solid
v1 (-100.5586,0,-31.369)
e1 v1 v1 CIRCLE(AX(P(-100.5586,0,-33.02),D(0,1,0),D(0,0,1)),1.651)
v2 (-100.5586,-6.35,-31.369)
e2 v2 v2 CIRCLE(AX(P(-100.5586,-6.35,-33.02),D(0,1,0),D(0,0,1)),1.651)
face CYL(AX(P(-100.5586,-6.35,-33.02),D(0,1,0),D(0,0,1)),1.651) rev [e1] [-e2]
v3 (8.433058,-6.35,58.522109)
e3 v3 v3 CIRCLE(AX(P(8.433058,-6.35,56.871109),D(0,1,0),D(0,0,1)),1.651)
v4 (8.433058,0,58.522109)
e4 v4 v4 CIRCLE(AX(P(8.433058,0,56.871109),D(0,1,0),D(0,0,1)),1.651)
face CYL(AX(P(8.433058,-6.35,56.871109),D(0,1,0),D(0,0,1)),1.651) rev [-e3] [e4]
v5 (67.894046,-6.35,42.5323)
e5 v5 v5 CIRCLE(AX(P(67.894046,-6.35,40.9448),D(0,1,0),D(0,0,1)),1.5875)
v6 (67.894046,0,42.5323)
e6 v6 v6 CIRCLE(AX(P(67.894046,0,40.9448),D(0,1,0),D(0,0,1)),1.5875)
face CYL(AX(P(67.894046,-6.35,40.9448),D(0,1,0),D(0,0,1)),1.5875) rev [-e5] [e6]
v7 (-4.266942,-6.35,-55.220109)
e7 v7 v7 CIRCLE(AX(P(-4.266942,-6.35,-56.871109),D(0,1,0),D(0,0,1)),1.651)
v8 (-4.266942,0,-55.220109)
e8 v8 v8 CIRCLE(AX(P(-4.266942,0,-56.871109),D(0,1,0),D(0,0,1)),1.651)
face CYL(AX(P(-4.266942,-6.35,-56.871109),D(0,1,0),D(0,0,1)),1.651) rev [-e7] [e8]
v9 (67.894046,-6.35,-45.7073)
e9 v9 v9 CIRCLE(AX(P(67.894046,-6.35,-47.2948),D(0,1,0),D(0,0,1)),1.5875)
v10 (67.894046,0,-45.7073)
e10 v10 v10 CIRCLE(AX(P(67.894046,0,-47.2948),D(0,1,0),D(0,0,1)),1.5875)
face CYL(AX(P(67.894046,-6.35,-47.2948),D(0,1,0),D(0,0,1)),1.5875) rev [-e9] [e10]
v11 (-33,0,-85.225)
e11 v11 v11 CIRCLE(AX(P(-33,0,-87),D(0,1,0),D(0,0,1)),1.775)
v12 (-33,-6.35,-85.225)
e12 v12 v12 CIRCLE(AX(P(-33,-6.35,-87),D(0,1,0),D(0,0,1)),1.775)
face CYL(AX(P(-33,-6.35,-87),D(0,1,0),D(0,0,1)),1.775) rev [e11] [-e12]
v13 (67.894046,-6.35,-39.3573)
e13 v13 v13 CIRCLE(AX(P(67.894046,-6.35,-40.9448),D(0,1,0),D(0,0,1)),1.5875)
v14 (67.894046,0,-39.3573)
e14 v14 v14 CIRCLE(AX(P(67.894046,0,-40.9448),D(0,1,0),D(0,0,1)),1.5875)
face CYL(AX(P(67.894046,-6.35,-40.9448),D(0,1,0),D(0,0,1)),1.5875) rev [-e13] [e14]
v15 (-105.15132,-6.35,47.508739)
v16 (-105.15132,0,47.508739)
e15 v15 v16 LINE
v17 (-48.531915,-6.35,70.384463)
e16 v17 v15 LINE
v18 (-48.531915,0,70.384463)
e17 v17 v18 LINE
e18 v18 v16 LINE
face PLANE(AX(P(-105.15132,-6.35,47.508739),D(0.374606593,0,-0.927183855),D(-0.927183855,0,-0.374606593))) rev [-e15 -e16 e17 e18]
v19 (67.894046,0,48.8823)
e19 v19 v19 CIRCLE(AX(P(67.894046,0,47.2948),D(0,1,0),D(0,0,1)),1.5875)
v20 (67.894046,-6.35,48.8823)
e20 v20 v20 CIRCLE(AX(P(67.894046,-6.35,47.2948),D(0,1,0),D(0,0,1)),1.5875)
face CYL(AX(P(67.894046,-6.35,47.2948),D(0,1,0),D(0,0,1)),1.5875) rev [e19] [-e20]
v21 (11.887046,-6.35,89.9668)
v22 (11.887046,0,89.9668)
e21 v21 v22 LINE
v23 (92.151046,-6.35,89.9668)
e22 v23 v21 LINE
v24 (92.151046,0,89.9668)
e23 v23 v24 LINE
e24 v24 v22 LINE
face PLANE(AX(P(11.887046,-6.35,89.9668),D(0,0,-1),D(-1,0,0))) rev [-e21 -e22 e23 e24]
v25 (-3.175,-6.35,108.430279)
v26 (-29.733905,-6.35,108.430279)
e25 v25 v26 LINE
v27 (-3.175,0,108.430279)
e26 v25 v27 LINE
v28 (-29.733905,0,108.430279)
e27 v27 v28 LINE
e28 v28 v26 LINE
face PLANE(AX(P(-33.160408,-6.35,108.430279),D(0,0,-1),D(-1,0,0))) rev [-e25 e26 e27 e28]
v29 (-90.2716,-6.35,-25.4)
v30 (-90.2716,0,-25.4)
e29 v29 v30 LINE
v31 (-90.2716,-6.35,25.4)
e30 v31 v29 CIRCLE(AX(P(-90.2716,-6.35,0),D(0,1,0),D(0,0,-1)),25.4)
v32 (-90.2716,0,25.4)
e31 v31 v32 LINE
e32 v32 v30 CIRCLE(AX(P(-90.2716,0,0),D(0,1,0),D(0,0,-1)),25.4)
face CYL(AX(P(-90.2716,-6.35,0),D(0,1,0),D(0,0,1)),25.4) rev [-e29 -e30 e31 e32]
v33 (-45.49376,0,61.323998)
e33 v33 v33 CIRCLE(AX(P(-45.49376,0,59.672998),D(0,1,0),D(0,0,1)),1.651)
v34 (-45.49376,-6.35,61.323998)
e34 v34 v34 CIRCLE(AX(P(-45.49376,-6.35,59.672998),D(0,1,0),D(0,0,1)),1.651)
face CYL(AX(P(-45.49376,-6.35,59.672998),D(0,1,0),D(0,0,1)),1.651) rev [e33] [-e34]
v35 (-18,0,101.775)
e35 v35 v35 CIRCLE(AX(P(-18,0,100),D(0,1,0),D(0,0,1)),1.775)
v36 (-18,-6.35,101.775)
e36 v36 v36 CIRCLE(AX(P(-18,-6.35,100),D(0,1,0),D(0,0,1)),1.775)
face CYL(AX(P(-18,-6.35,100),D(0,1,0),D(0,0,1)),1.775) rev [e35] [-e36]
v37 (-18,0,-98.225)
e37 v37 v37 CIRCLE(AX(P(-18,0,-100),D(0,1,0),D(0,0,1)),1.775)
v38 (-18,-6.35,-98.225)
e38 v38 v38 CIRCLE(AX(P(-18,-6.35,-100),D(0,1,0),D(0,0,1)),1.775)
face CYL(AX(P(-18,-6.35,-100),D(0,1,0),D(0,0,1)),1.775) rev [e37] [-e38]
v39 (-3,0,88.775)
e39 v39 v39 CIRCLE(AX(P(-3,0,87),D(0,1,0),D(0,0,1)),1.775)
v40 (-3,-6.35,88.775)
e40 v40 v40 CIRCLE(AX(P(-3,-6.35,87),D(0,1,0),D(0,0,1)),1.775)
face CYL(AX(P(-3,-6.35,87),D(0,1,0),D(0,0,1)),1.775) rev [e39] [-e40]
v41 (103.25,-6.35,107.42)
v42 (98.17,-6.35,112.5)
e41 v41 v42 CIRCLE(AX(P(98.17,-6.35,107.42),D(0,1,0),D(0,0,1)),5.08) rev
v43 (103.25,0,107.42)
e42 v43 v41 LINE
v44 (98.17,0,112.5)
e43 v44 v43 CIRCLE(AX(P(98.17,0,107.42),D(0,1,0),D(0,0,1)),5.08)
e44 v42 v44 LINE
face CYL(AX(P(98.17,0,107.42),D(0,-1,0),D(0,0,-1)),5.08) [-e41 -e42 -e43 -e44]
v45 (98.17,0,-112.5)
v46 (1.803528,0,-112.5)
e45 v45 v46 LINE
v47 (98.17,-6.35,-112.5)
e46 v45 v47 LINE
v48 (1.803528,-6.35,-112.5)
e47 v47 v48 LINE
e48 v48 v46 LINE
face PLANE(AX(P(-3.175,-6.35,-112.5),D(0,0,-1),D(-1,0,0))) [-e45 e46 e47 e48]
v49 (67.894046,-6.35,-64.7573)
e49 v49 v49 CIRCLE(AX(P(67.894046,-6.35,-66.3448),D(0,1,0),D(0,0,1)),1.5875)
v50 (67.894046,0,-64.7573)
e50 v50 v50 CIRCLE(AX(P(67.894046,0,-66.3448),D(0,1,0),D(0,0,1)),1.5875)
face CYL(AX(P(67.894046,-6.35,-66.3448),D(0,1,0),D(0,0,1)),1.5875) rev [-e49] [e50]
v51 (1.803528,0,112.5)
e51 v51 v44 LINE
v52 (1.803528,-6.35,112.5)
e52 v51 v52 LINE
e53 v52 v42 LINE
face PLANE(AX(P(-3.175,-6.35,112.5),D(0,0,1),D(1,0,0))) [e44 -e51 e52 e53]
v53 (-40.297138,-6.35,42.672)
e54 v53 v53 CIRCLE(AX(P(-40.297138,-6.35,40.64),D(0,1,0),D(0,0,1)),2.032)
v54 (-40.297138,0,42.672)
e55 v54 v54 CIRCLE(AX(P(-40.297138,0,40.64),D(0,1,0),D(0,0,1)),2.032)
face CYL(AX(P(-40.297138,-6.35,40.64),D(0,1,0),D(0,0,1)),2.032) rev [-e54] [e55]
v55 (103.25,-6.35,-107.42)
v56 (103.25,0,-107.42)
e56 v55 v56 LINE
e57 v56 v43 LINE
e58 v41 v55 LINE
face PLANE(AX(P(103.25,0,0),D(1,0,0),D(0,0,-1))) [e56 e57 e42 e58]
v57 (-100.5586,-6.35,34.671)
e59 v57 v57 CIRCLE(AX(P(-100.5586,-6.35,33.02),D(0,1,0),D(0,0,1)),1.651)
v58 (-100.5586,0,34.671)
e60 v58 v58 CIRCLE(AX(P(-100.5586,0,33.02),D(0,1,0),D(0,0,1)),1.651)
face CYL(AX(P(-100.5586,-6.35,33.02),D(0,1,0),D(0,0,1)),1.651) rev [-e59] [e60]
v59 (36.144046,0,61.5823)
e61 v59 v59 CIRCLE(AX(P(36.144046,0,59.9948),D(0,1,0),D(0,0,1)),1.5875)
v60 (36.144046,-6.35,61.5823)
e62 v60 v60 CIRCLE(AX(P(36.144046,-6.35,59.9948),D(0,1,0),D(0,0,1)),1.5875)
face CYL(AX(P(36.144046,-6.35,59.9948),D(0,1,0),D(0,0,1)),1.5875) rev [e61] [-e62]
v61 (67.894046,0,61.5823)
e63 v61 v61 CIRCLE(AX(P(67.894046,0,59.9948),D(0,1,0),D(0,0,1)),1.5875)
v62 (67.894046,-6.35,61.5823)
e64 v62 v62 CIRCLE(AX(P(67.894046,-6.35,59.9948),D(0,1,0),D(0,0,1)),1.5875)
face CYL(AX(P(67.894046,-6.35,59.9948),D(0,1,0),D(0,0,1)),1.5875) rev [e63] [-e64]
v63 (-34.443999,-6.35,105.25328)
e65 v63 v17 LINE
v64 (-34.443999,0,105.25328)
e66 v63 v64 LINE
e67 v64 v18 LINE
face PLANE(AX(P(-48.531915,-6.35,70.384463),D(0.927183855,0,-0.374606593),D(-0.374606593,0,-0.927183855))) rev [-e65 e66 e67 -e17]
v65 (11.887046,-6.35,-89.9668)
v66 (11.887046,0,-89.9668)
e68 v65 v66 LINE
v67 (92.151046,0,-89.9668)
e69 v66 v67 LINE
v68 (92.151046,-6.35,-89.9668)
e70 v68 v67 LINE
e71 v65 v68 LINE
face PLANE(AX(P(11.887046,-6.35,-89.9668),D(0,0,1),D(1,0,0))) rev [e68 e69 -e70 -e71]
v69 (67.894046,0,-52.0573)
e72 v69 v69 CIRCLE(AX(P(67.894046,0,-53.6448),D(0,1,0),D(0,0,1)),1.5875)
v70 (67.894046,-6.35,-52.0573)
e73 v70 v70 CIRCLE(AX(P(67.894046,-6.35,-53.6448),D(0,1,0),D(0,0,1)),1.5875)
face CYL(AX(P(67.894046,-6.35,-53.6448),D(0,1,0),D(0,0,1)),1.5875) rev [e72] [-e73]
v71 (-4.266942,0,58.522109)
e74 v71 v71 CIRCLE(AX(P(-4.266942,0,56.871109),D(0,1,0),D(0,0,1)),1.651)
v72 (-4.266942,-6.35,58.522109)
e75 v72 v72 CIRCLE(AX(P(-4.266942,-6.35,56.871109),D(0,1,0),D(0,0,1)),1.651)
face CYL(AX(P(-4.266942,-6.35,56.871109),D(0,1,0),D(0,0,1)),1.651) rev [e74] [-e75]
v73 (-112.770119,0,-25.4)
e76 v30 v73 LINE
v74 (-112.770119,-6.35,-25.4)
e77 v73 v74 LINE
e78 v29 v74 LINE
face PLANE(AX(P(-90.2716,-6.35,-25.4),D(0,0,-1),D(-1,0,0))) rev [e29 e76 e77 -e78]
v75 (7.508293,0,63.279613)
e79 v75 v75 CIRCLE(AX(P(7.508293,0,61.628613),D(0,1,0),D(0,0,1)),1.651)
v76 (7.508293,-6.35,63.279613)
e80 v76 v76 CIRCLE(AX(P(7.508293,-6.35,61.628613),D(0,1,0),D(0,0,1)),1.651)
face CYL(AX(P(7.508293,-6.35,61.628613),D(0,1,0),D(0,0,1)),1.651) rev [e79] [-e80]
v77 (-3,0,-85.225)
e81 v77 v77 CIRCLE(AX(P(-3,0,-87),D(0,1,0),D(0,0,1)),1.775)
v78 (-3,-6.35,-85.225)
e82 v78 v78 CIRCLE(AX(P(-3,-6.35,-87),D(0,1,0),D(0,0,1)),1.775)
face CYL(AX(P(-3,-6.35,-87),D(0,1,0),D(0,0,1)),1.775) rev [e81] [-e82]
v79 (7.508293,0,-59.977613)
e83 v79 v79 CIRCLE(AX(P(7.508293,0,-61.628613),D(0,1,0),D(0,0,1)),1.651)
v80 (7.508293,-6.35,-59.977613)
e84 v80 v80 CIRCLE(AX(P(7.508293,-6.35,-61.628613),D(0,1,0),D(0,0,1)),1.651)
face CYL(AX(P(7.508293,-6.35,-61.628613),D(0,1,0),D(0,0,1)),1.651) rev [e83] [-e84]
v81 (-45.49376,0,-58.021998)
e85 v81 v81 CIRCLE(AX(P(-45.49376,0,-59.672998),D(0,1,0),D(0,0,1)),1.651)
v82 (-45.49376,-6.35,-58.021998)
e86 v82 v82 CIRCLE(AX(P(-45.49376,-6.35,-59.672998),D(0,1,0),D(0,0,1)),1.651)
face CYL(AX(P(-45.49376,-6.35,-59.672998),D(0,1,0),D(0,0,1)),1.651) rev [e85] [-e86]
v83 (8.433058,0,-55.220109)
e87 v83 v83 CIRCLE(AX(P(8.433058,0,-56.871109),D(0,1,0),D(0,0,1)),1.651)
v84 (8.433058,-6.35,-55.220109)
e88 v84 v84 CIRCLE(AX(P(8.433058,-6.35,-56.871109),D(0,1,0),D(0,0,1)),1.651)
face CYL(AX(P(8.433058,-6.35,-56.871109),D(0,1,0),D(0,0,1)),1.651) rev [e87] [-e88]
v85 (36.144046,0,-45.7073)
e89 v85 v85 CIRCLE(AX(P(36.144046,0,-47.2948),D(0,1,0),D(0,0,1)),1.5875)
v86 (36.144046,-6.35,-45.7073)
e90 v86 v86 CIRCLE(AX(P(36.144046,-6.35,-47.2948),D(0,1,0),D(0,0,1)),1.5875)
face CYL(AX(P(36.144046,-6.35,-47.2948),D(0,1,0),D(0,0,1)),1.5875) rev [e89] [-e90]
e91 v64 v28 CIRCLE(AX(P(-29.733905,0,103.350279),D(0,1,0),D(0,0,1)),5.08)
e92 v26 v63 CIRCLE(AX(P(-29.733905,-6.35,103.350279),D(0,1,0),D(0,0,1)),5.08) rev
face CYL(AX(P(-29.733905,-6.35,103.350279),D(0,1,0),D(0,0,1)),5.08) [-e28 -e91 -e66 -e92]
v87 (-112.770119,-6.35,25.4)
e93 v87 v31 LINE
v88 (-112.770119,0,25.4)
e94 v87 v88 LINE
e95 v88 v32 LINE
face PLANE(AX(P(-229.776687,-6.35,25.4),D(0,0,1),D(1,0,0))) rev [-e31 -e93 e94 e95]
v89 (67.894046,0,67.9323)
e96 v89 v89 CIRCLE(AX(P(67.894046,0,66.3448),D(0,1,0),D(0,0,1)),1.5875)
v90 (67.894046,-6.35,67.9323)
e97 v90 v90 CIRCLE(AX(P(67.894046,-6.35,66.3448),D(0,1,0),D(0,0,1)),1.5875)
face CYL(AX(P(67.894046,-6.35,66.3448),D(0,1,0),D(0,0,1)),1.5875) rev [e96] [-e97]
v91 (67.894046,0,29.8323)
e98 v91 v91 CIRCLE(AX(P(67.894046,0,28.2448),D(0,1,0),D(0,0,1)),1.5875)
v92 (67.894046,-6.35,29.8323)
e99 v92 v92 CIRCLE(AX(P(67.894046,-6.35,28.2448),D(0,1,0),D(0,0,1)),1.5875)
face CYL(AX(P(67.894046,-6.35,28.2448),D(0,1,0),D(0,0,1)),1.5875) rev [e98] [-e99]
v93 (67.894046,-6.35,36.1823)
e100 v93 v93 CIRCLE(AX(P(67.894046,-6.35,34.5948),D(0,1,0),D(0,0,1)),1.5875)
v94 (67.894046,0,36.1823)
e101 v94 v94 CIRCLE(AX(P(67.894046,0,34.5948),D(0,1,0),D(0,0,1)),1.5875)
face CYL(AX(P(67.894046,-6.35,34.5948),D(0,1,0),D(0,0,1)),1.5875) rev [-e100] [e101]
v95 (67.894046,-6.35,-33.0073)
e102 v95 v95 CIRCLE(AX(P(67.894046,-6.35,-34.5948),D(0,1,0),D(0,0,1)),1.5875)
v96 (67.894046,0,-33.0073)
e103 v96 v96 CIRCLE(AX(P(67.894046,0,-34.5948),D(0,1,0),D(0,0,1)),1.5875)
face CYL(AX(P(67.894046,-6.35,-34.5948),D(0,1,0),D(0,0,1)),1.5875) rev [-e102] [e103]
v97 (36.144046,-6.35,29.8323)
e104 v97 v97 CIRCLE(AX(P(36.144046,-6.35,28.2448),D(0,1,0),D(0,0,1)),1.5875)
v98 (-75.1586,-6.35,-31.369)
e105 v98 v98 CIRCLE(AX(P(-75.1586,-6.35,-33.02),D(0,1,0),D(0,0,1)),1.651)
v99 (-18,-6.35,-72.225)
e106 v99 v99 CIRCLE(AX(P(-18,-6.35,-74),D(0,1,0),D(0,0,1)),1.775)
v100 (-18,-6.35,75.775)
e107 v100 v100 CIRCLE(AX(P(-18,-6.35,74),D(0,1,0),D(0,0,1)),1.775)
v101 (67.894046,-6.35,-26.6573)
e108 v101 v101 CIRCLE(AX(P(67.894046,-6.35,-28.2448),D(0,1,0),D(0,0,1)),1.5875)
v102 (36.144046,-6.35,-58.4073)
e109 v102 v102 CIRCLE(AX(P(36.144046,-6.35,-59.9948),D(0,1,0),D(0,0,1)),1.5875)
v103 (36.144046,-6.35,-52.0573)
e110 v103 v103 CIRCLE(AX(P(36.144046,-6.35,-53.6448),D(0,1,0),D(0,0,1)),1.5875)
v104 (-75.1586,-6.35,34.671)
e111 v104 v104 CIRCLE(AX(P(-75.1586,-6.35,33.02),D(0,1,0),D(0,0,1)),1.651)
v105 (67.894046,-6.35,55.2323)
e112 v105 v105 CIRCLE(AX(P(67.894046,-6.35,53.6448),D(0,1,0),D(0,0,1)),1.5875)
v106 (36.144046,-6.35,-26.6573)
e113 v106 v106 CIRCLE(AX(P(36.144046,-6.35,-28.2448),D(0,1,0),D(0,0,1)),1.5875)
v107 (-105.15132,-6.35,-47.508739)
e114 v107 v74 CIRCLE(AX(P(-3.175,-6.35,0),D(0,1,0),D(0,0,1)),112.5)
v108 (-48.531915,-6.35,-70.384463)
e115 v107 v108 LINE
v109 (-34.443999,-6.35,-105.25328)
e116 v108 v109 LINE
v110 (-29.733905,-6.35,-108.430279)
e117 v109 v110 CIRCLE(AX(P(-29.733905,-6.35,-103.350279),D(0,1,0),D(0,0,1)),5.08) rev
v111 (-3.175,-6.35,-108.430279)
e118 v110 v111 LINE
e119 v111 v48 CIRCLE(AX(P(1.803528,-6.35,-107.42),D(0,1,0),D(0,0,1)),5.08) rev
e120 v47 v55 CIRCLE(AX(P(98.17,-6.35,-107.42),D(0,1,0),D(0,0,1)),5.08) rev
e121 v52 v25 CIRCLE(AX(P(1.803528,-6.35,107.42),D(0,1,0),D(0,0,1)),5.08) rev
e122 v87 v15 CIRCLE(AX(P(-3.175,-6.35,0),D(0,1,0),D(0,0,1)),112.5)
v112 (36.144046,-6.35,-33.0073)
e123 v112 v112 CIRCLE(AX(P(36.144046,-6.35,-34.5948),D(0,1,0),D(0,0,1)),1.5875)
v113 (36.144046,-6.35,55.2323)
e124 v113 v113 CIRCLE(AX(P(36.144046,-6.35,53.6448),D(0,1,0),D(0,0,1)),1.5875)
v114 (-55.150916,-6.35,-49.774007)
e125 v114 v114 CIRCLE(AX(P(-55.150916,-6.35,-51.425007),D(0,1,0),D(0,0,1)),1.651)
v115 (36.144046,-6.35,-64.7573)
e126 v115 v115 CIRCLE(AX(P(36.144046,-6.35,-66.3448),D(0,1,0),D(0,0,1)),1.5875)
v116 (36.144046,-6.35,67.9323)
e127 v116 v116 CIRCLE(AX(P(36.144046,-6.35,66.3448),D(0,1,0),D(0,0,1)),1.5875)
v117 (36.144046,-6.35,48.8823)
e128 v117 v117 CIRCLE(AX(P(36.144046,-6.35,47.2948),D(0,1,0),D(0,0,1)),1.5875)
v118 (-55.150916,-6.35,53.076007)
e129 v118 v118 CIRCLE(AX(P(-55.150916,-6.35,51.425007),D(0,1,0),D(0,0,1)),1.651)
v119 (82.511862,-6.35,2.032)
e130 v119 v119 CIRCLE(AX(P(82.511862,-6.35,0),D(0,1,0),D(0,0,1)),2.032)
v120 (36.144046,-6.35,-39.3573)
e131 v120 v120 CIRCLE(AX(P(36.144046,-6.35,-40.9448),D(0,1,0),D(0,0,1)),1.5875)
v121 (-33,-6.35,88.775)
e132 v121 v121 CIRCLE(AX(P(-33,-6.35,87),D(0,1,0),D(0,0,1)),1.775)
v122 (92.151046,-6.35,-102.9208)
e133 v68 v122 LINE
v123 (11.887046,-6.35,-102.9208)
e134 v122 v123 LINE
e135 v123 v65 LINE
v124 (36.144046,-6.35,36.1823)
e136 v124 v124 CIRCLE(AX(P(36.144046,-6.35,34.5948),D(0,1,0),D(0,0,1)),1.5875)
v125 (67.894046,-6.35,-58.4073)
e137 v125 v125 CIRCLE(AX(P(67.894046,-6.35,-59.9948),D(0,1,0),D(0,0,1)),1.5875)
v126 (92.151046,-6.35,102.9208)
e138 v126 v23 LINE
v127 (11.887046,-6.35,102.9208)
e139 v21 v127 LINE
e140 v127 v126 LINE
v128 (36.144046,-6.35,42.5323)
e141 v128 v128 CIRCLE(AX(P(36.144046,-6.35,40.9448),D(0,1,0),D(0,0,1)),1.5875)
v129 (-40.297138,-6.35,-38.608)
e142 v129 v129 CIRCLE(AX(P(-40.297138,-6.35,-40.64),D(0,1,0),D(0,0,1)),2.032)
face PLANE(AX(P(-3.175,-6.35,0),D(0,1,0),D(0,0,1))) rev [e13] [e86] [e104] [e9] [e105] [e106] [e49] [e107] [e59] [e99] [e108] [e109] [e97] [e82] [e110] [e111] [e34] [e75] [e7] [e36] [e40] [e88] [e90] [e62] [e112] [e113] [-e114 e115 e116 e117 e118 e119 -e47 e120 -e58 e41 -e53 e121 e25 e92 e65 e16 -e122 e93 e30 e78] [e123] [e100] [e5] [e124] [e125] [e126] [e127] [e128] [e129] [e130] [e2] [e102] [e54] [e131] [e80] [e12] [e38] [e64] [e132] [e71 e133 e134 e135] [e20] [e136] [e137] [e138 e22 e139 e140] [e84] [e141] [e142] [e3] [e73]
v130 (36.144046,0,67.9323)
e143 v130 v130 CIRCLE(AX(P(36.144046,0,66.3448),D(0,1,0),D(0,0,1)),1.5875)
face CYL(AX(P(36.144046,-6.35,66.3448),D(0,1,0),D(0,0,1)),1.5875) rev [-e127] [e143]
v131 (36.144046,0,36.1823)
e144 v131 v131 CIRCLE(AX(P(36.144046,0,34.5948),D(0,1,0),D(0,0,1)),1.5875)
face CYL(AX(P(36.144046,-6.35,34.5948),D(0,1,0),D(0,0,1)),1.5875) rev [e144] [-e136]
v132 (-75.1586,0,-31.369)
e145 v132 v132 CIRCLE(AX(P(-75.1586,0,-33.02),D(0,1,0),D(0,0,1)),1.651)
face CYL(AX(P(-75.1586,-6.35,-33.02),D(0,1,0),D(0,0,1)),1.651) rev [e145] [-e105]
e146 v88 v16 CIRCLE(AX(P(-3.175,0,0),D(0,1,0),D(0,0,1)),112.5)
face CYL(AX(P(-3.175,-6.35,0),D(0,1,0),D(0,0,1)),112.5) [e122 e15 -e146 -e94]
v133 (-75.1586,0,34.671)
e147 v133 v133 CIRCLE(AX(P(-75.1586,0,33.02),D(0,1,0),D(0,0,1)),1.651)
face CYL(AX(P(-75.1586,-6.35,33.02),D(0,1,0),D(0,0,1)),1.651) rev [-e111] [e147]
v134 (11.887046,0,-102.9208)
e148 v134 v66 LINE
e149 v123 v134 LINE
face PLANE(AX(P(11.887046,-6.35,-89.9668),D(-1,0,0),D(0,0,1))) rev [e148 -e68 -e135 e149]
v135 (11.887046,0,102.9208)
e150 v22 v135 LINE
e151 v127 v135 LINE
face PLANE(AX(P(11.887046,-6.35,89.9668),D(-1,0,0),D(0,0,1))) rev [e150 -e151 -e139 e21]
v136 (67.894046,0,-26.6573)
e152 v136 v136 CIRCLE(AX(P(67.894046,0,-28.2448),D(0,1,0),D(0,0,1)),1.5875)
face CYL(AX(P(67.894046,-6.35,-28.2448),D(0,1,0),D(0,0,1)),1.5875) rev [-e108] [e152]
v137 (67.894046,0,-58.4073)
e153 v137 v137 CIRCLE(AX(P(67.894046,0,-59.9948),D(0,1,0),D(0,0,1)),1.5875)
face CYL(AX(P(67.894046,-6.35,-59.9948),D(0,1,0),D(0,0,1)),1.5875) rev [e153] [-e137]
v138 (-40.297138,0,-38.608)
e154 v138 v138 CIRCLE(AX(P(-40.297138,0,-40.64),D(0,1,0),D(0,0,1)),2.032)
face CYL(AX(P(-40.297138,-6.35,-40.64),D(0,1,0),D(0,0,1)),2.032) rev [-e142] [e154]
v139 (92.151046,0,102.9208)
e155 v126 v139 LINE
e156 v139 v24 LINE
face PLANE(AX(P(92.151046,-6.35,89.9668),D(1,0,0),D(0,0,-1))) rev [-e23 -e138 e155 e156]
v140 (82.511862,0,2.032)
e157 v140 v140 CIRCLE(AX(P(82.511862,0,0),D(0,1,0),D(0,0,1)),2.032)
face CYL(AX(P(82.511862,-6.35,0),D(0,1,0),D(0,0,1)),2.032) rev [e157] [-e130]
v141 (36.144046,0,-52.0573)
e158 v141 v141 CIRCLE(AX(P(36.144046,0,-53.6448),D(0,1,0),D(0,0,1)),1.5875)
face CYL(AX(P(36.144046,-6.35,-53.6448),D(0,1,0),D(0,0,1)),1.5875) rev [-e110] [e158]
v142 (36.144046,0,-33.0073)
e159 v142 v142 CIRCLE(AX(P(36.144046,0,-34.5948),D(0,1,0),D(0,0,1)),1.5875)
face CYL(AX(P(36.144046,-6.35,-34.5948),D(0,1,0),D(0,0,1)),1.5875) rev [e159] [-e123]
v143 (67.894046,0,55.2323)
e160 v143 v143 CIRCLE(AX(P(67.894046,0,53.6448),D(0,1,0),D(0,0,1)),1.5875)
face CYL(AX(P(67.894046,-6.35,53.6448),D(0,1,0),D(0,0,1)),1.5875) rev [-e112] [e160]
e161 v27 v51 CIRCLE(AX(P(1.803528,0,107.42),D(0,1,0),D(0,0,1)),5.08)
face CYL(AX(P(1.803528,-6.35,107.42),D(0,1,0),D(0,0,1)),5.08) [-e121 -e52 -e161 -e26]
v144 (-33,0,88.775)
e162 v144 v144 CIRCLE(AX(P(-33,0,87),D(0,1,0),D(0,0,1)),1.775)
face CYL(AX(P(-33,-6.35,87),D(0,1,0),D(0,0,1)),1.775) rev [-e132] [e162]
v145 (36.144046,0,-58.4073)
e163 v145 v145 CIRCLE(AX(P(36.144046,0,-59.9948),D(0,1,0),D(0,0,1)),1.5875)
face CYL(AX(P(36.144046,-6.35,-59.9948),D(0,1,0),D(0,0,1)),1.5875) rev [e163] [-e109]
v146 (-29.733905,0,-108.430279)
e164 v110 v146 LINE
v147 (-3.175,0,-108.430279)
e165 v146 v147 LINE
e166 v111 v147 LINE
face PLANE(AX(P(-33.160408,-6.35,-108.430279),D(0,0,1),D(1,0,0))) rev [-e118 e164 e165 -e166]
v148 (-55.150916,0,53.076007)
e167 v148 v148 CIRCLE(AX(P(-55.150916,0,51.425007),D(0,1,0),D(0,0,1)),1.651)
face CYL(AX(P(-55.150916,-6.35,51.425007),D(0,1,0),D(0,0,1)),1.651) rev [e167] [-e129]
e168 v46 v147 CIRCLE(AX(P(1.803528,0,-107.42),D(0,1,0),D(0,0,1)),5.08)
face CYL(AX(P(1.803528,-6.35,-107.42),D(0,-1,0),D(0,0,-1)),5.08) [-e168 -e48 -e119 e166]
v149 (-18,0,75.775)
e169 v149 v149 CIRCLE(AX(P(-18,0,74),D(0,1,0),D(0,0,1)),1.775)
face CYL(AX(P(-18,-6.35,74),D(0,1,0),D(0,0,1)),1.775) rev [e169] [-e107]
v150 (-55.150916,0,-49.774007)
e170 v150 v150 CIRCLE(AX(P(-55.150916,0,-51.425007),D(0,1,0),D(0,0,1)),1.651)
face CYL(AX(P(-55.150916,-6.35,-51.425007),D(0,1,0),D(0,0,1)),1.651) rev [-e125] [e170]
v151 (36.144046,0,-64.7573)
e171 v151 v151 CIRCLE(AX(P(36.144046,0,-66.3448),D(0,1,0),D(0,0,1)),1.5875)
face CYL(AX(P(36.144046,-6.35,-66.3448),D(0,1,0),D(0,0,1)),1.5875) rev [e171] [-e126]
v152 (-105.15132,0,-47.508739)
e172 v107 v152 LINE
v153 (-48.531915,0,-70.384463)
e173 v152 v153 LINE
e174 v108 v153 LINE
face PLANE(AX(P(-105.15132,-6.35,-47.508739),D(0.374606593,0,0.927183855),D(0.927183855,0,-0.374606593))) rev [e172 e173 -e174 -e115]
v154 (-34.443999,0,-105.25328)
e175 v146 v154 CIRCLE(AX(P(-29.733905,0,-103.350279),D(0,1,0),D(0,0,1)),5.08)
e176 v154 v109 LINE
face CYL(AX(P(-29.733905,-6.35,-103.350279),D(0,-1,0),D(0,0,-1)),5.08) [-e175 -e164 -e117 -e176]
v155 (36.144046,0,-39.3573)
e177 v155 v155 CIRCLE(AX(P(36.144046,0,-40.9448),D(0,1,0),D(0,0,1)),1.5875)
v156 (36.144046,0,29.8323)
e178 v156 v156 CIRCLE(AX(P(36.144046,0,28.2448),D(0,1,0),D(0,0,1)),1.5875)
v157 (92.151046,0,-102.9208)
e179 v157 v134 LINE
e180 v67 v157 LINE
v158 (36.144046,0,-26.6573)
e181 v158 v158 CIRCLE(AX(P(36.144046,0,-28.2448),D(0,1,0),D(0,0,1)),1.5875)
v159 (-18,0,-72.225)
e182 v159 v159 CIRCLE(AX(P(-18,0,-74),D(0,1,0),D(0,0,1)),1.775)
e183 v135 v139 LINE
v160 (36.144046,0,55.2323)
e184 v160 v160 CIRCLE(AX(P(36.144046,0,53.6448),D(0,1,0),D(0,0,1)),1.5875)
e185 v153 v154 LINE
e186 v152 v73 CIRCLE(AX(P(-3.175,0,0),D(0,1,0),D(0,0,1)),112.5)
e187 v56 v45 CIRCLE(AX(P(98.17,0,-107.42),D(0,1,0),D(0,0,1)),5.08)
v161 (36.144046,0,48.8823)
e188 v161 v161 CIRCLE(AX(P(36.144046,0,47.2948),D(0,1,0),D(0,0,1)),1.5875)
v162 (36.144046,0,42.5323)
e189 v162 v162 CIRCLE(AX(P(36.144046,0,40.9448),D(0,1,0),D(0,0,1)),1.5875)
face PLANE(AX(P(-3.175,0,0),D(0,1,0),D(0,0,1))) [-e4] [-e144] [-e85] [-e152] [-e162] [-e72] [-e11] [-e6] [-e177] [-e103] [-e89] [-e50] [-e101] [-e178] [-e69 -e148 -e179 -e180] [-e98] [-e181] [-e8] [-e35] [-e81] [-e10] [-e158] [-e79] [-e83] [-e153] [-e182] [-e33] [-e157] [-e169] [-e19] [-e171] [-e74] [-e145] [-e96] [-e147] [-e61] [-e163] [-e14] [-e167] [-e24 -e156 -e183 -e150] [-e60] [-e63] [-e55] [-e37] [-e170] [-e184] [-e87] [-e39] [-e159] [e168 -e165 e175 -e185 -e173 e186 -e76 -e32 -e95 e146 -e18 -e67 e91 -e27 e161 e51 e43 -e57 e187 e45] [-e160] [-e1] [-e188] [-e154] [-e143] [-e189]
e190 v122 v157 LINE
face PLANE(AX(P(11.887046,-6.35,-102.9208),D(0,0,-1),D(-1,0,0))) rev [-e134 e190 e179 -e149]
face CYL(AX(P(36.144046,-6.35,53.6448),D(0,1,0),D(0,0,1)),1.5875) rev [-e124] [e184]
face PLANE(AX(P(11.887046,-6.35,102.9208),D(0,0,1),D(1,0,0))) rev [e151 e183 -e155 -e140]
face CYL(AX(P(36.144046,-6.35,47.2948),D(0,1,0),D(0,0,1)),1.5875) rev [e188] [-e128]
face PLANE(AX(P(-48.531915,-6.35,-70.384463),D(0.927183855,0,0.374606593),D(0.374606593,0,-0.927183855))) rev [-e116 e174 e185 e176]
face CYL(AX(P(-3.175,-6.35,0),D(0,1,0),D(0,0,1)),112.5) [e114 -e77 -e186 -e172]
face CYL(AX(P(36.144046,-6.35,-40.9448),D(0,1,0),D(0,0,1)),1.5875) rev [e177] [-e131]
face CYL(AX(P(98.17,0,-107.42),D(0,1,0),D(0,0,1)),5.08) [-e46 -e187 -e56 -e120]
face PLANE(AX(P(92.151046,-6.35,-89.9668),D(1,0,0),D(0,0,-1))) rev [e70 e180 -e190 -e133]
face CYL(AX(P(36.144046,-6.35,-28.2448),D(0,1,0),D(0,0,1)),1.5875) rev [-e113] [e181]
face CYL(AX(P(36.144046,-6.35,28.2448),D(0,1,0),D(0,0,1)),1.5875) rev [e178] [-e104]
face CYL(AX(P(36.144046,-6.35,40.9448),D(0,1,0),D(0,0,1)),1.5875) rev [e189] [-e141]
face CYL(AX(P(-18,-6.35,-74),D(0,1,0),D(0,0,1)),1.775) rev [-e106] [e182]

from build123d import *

# Parameters (mm, degrees)
BOSS_EXTRUDE1_DEPTH    = 6.35
SKETCH2_R              = 1.5875
SKETCH2_W              = 80.264
SKETCH2_H              = 12.954
CUT_EXTRUDE1_DEPTH     = 162.484606465
SKETCH7_R              = 2.032
CUT_EXTRUDE4_DEPTH     = 162.484606465
SKETCH8_R              = 1.651
CUT_EXTRUDE5_DEPTH     = 162.484606465
CUT_EXTRUDE6_DEPTH     = 160.416662013
SKETCH10_R             = 1.651
CUT_EXTRUDE7_DEPTH     = 160.416662013
SKETCH11_W             = 225
SKETCH11_H             = 6.35
BOSS_EXTRUDE2_DEPTH    = 8
FILLET2_R              = 5.08
SKETCH15_W             = 29.985408059
SKETCH15_H             = 4.069721463
CUT_EXTRUDE8_DEPTH     = 160.416662013
CUT_EXTRUDE9_START     = -6.35
CUT_EXTRUDE9_OUTLINE_R = 1.775
CUT_EXTRUDE9_DEPTH     = 6.35


# Read off the part's stored shape, not the designer's step: Cut-Extrude9
with BuildPart() as part:
    # Sketch1 → Boss-Extrude1 (new body)
    with BuildSketch(Plane(origin=(0, 0, 0), x_dir=(1, 0, 0), z_dir=(0, 1, 0))):
        with BuildLine():
            Line((-3.175, 112.5), (95.25, 112.5))
            Line((95.25, 112.5), (95.25, -112.5))
            Line((95.25, -112.5), (-3.175, -112.5))
            ThreePointArc((-3.175, -112.5), (-115.675, 0), (-3.175, 112.5))
        make_face()
    extrude(amount=-BOSS_EXTRUDE1_DEPTH)

    # Sketch2 → Cut-Extrude1 (cut, through all)
    with BuildSketch(Plane(origin=(0, 0, 0), x_dir=(1, 0, 0), z_dir=(0, 1, 0))):
        with Locations(Location((36.144045702, -66.3448, 0), (0, 0, 270))):
            Circle(SKETCH2_R)
        with Locations(Location((36.144045702, -59.9948, 0), (0, 0, 270))):
            Circle(SKETCH2_R)
        with Locations(Location((36.144045702, -53.6448, 0), (0, 0, 270))):
            Circle(SKETCH2_R)
        with Locations(Location((36.144045702, -47.2948, 0), (0, 0, 270))):
            Circle(SKETCH2_R)
        with Locations(Location((36.144045702, -40.9448, 0), (0, 0, 270))):
            Circle(SKETCH2_R)
        with Locations(Location((36.144045702, -34.5948, 0), (0, 0, 270))):
            Circle(SKETCH2_R)
        with Locations(Location((36.144045702, -28.2448, 0), (0, 0, 270))):
            Circle(SKETCH2_R)
        with Locations(Location((67.894045702, -66.3448, 0), (0, 0, 270))):
            Circle(SKETCH2_R)
        with Locations(Location((67.894045702, -59.9948, 0), (0, 0, 270))):
            Circle(SKETCH2_R)
        with Locations(Location((67.894045702, -53.6448, 0), (0, 0, 270))):
            Circle(SKETCH2_R)
        with Locations(Location((67.894045702, -47.2948, 0), (0, 0, 270))):
            Circle(SKETCH2_R)
        with Locations(Location((67.894045702, -40.9448, 0), (0, 0, 270))):
            Circle(SKETCH2_R)
        with Locations(Location((67.894045702, -34.5948, 0), (0, 0, 270))):
            Circle(SKETCH2_R)
        with Locations(Location((67.894045702, -28.2448, 0), (0, 0, 270))):
            Circle(SKETCH2_R)
        with Locations(Location((36.144045702, 66.3448, 0), (0, 0, 270))):
            Circle(SKETCH2_R)
        with Locations(Location((36.144045702, 59.9948, 0), (0, 0, 270))):
            Circle(SKETCH2_R)
        with Locations(Location((36.144045702, 53.6448, 0), (0, 0, 270))):
            Circle(SKETCH2_R)
        with Locations(Location((36.144045702, 47.2948, 0), (0, 0, 270))):
            Circle(SKETCH2_R)
        with Locations(Location((36.144045702, 40.9448, 0), (0, 0, 270))):
            Circle(SKETCH2_R)
        with Locations(Location((36.144045702, 34.5948, 0), (0, 0, 270))):
            Circle(SKETCH2_R)
        with Locations(Location((36.144045702, 28.2448, 0), (0, 0, 270))):
            Circle(SKETCH2_R)
        with Locations(Location((67.894045702, 66.3448, 0), (0, 0, 270))):
            Circle(SKETCH2_R)
        with Locations(Location((67.894045702, 59.9948, 0), (0, 0, 270))):
            Circle(SKETCH2_R)
        with Locations(Location((67.894045702, 53.6448, 0), (0, 0, 270))):
            Circle(SKETCH2_R)
        with Locations(Location((67.894045702, 47.2948, 0), (0, 0, 270))):
            Circle(SKETCH2_R)
        with Locations(Location((67.894045702, 40.9448, 0), (0, 0, 270))):
            Circle(SKETCH2_R)
        with Locations(Location((67.894045702, 34.5948, 0), (0, 0, 270))):
            Circle(SKETCH2_R)
        with Locations(Location((67.894045702, 28.2448, 0), (0, 0, 270))):
            Circle(SKETCH2_R)
        with Locations((52.019045702, -96.4438)):
            Rectangle(SKETCH2_W, SKETCH2_H)
        with Locations((52.019045702, 96.4438)):
            Rectangle(SKETCH2_W, SKETCH2_H)
    extrude(amount=-CUT_EXTRUDE1_DEPTH, mode=Mode.SUBTRACT)

    # Sketch7 → Cut-Extrude4 (cut, through all)
    with BuildSketch(Plane(origin=(0, 0, 0), x_dir=(1, 0, 0), z_dir=(0, 1, 0))):
        with Locations(Location((82.511862056, 0, 0), (0, 0, 270))):
            Circle(SKETCH7_R)
        with Locations(Location((-40.297137944, 40.64, 0), (0, 0, 270))):
            Circle(SKETCH7_R)
        with Locations(Location((-40.297137944, -40.64, 0), (0, 0, 270))):
            Circle(SKETCH7_R)
    extrude(amount=-CUT_EXTRUDE4_DEPTH, mode=Mode.SUBTRACT)

    # Sketch8 → Cut-Extrude5 (cut, through all)
    with BuildSketch(Plane(origin=(0, 0, 0), x_dir=(1, 0, 0), z_dir=(0, 1, 0))):
        with Locations(Location((-100.5586, 33.02, 0), (0, 0, 270))):
            Circle(SKETCH8_R)
        with Locations(Location((-100.5586, -33.02, 0), (0, 0, 270))):
            Circle(SKETCH8_R)
        with Locations(Location((-75.1586, 33.02, 0), (0, 0, 270))):
            Circle(SKETCH8_R)
        with Locations(Location((-75.1586, -33.02, 0), (0, 0, 270))):
            Circle(SKETCH8_R)
        with BuildLine():
            Line((-90.2716, 25.4), (-229.776686608, 25.4))
            Line((-229.776686608, 25.4), (-229.776686608, -25.4))
            Line((-229.776686608, -25.4), (-90.2716, -25.4))
            ThreePointArc((-90.2716, -25.4), (-64.8716, 0), (-90.2716, 25.4))
        make_face()
    extrude(amount=-CUT_EXTRUDE5_DEPTH, mode=Mode.SUBTRACT)

    # Sketch9 → Cut-Extrude6 (cut, through all)
    with BuildSketch(Plane(origin=(0, 0, 0), x_dir=(1, 0, 0), z_dir=(0, 1, 0))):
        Polygon((-105.15131959, 47.508738596), (-48.53191541, 70.384462776), (-12.279886537, 160.111382848), (-19.546794421, 160.111382848), (-135.640402248, 160.111382848), (-135.640402248, 47.508738596), align=None)
        Polygon((-105.15131959, -47.508738596), (-48.53191541, -70.384462776), (-12.279886537, -160.111382848), (-135.640402248, -160.111382848), (-135.640402248, -47.508738596), align=None)
    extrude(amount=-CUT_EXTRUDE6_DEPTH, mode=Mode.SUBTRACT)

    # Sketch10 → Cut-Extrude7 (cut, through all)
    with BuildSketch(Plane(origin=(0, 0, 0), x_dir=(1, 0, 0), z_dir=(0, 1, 0))):
        with Locations(Location((-55.150916162, 51.425007473, 0), (0, 0, 270))):
            Circle(SKETCH10_R)
        with Locations(Location((-45.493760399, 59.672997687, 0), (0, 0, 270))):
            Circle(SKETCH10_R)
        with Locations(Location((-4.266941588, 56.871109398, 0), (0, 0, 270))):
            Circle(SKETCH10_R)
        with Locations(Location((7.508293365, 61.628613135, 0), (0, 0, 270))):
            Circle(SKETCH10_R)
        with Locations(Location((8.433058412, -56.871109398, 0), (0, 0, 270))):
            Circle(SKETCH10_R)
        with Locations(Location((8.433058412, 56.871109398, 0), (0, 0, 270))):
            Circle(SKETCH10_R)
        with Locations(Location((-55.150916162, -51.425007473, 0), (0, 0, 270))):
            Circle(SKETCH10_R)
        with Locations(Location((-45.493760399, -59.672997687, 0), (0, 0, 270))):
            Circle(SKETCH10_R)
        with Locations(Location((-4.266941588, -56.871109398, 0), (0, 0, 270))):
            Circle(SKETCH10_R)
        with Locations(Location((7.508293365, -61.628613135, 0), (0, 0, 270))):
            Circle(SKETCH10_R)
    extrude(amount=-CUT_EXTRUDE7_DEPTH, mode=Mode.SUBTRACT)

    # Sketch11 → Boss-Extrude2 (add)
    with BuildSketch(Plane(origin=(95.25, 0, 0), x_dir=(0, 0, -1), z_dir=(1, 0, 0))):
        with Locations((0, -3.175)):
            Rectangle(SKETCH11_W, SKETCH11_H)
    extrude(amount=BOSS_EXTRUDE2_DEPTH)

    # Fillet2
    fillet2_edges = [part.edges().sort_by_distance(p)[0] for p in [
        (103.25, -3.175, -112.5),
        (103.25, -3.175, 112.5),
    ]]
    fillet(fillet2_edges, radius=FILLET2_R)

    # Sketch15 → Cut-Extrude8 (cut, through all)
    with BuildSketch(Plane(origin=(0, 0, 0), x_dir=(1, 0, 0), z_dir=(0, 1, 0))):
        with Locations((-18.16770403, -110.465139268)):
            Rectangle(SKETCH15_W, SKETCH15_H)
        with Locations((-18.16770403, 110.465139268)):
            Rectangle(SKETCH15_W, SKETCH15_H)
    extrude(amount=-CUT_EXTRUDE8_DEPTH, mode=Mode.SUBTRACT)

    # Cut-Extrude9 outline → Cut-Extrude9 (cut)
    with BuildSketch(Plane(origin=(0, 0, 0), x_dir=(1, 0, 0), z_dir=(0, 1, 0)).offset(CUT_EXTRUDE9_START)):
        with BuildLine():
            Line((-3.175, 112.5), (-3.175, 108.430278537))
            ThreePointArc((-3.175, 108.430278537), (-1.411607293, 111.353104052), (1.803527622, 112.5))
            Line((1.803527622, 112.5), (-3.175, 112.5))
        make_face()
        with BuildLine():
            ThreePointArc((-34.443998775, 105.253280031), (-32.574604743, 107.561789405), (-29.733904794, 108.430278537))
            Line((-29.733904794, 108.430278537), (-33.160408059, 108.430278537))
            Line((-33.160408059, 108.430278537), (-34.443998775, 105.253280031))
        make_face()
        with BuildLine():
            Line((-33.160408059, -108.430278537), (-29.733904794, -108.430278537))
            ThreePointArc((-29.733904794, -108.430278537), (-32.574604743, -107.561789405), (-34.443998775, -105.253280031))
            Line((-34.443998775, -105.253280031), (-33.160408059, -108.430278537))
        make_face()
        with BuildLine():
            ThreePointArc((1.803527622, -112.5), (-1.411607293, -111.353104052), (-3.175, -108.430278537))
            Line((-3.175, -108.430278537), (-3.175, -112.5))
            Line((-3.175, -112.5), (1.803527622, -112.5))
        make_face()
        with Locations((-33, -87)):
            Circle(CUT_EXTRUDE9_OUTLINE_R)
        with Locations((-18, -100)):
            Circle(CUT_EXTRUDE9_OUTLINE_R)
        with Locations((-18, -74)):
            Circle(CUT_EXTRUDE9_OUTLINE_R)
        with Locations((-3, -87)):
            Circle(CUT_EXTRUDE9_OUTLINE_R)
        with Locations((-33, 87)):
            Circle(CUT_EXTRUDE9_OUTLINE_R)
        with Locations((-18, 100)):
            Circle(CUT_EXTRUDE9_OUTLINE_R)
        with Locations((-18, 74)):
            Circle(CUT_EXTRUDE9_OUTLINE_R)
        with Locations((-3, 87)):
            Circle(CUT_EXTRUDE9_OUTLINE_R)
    extrude(amount=CUT_EXTRUDE9_DEPTH, mode=Mode.SUBTRACT)


solid = part.part
